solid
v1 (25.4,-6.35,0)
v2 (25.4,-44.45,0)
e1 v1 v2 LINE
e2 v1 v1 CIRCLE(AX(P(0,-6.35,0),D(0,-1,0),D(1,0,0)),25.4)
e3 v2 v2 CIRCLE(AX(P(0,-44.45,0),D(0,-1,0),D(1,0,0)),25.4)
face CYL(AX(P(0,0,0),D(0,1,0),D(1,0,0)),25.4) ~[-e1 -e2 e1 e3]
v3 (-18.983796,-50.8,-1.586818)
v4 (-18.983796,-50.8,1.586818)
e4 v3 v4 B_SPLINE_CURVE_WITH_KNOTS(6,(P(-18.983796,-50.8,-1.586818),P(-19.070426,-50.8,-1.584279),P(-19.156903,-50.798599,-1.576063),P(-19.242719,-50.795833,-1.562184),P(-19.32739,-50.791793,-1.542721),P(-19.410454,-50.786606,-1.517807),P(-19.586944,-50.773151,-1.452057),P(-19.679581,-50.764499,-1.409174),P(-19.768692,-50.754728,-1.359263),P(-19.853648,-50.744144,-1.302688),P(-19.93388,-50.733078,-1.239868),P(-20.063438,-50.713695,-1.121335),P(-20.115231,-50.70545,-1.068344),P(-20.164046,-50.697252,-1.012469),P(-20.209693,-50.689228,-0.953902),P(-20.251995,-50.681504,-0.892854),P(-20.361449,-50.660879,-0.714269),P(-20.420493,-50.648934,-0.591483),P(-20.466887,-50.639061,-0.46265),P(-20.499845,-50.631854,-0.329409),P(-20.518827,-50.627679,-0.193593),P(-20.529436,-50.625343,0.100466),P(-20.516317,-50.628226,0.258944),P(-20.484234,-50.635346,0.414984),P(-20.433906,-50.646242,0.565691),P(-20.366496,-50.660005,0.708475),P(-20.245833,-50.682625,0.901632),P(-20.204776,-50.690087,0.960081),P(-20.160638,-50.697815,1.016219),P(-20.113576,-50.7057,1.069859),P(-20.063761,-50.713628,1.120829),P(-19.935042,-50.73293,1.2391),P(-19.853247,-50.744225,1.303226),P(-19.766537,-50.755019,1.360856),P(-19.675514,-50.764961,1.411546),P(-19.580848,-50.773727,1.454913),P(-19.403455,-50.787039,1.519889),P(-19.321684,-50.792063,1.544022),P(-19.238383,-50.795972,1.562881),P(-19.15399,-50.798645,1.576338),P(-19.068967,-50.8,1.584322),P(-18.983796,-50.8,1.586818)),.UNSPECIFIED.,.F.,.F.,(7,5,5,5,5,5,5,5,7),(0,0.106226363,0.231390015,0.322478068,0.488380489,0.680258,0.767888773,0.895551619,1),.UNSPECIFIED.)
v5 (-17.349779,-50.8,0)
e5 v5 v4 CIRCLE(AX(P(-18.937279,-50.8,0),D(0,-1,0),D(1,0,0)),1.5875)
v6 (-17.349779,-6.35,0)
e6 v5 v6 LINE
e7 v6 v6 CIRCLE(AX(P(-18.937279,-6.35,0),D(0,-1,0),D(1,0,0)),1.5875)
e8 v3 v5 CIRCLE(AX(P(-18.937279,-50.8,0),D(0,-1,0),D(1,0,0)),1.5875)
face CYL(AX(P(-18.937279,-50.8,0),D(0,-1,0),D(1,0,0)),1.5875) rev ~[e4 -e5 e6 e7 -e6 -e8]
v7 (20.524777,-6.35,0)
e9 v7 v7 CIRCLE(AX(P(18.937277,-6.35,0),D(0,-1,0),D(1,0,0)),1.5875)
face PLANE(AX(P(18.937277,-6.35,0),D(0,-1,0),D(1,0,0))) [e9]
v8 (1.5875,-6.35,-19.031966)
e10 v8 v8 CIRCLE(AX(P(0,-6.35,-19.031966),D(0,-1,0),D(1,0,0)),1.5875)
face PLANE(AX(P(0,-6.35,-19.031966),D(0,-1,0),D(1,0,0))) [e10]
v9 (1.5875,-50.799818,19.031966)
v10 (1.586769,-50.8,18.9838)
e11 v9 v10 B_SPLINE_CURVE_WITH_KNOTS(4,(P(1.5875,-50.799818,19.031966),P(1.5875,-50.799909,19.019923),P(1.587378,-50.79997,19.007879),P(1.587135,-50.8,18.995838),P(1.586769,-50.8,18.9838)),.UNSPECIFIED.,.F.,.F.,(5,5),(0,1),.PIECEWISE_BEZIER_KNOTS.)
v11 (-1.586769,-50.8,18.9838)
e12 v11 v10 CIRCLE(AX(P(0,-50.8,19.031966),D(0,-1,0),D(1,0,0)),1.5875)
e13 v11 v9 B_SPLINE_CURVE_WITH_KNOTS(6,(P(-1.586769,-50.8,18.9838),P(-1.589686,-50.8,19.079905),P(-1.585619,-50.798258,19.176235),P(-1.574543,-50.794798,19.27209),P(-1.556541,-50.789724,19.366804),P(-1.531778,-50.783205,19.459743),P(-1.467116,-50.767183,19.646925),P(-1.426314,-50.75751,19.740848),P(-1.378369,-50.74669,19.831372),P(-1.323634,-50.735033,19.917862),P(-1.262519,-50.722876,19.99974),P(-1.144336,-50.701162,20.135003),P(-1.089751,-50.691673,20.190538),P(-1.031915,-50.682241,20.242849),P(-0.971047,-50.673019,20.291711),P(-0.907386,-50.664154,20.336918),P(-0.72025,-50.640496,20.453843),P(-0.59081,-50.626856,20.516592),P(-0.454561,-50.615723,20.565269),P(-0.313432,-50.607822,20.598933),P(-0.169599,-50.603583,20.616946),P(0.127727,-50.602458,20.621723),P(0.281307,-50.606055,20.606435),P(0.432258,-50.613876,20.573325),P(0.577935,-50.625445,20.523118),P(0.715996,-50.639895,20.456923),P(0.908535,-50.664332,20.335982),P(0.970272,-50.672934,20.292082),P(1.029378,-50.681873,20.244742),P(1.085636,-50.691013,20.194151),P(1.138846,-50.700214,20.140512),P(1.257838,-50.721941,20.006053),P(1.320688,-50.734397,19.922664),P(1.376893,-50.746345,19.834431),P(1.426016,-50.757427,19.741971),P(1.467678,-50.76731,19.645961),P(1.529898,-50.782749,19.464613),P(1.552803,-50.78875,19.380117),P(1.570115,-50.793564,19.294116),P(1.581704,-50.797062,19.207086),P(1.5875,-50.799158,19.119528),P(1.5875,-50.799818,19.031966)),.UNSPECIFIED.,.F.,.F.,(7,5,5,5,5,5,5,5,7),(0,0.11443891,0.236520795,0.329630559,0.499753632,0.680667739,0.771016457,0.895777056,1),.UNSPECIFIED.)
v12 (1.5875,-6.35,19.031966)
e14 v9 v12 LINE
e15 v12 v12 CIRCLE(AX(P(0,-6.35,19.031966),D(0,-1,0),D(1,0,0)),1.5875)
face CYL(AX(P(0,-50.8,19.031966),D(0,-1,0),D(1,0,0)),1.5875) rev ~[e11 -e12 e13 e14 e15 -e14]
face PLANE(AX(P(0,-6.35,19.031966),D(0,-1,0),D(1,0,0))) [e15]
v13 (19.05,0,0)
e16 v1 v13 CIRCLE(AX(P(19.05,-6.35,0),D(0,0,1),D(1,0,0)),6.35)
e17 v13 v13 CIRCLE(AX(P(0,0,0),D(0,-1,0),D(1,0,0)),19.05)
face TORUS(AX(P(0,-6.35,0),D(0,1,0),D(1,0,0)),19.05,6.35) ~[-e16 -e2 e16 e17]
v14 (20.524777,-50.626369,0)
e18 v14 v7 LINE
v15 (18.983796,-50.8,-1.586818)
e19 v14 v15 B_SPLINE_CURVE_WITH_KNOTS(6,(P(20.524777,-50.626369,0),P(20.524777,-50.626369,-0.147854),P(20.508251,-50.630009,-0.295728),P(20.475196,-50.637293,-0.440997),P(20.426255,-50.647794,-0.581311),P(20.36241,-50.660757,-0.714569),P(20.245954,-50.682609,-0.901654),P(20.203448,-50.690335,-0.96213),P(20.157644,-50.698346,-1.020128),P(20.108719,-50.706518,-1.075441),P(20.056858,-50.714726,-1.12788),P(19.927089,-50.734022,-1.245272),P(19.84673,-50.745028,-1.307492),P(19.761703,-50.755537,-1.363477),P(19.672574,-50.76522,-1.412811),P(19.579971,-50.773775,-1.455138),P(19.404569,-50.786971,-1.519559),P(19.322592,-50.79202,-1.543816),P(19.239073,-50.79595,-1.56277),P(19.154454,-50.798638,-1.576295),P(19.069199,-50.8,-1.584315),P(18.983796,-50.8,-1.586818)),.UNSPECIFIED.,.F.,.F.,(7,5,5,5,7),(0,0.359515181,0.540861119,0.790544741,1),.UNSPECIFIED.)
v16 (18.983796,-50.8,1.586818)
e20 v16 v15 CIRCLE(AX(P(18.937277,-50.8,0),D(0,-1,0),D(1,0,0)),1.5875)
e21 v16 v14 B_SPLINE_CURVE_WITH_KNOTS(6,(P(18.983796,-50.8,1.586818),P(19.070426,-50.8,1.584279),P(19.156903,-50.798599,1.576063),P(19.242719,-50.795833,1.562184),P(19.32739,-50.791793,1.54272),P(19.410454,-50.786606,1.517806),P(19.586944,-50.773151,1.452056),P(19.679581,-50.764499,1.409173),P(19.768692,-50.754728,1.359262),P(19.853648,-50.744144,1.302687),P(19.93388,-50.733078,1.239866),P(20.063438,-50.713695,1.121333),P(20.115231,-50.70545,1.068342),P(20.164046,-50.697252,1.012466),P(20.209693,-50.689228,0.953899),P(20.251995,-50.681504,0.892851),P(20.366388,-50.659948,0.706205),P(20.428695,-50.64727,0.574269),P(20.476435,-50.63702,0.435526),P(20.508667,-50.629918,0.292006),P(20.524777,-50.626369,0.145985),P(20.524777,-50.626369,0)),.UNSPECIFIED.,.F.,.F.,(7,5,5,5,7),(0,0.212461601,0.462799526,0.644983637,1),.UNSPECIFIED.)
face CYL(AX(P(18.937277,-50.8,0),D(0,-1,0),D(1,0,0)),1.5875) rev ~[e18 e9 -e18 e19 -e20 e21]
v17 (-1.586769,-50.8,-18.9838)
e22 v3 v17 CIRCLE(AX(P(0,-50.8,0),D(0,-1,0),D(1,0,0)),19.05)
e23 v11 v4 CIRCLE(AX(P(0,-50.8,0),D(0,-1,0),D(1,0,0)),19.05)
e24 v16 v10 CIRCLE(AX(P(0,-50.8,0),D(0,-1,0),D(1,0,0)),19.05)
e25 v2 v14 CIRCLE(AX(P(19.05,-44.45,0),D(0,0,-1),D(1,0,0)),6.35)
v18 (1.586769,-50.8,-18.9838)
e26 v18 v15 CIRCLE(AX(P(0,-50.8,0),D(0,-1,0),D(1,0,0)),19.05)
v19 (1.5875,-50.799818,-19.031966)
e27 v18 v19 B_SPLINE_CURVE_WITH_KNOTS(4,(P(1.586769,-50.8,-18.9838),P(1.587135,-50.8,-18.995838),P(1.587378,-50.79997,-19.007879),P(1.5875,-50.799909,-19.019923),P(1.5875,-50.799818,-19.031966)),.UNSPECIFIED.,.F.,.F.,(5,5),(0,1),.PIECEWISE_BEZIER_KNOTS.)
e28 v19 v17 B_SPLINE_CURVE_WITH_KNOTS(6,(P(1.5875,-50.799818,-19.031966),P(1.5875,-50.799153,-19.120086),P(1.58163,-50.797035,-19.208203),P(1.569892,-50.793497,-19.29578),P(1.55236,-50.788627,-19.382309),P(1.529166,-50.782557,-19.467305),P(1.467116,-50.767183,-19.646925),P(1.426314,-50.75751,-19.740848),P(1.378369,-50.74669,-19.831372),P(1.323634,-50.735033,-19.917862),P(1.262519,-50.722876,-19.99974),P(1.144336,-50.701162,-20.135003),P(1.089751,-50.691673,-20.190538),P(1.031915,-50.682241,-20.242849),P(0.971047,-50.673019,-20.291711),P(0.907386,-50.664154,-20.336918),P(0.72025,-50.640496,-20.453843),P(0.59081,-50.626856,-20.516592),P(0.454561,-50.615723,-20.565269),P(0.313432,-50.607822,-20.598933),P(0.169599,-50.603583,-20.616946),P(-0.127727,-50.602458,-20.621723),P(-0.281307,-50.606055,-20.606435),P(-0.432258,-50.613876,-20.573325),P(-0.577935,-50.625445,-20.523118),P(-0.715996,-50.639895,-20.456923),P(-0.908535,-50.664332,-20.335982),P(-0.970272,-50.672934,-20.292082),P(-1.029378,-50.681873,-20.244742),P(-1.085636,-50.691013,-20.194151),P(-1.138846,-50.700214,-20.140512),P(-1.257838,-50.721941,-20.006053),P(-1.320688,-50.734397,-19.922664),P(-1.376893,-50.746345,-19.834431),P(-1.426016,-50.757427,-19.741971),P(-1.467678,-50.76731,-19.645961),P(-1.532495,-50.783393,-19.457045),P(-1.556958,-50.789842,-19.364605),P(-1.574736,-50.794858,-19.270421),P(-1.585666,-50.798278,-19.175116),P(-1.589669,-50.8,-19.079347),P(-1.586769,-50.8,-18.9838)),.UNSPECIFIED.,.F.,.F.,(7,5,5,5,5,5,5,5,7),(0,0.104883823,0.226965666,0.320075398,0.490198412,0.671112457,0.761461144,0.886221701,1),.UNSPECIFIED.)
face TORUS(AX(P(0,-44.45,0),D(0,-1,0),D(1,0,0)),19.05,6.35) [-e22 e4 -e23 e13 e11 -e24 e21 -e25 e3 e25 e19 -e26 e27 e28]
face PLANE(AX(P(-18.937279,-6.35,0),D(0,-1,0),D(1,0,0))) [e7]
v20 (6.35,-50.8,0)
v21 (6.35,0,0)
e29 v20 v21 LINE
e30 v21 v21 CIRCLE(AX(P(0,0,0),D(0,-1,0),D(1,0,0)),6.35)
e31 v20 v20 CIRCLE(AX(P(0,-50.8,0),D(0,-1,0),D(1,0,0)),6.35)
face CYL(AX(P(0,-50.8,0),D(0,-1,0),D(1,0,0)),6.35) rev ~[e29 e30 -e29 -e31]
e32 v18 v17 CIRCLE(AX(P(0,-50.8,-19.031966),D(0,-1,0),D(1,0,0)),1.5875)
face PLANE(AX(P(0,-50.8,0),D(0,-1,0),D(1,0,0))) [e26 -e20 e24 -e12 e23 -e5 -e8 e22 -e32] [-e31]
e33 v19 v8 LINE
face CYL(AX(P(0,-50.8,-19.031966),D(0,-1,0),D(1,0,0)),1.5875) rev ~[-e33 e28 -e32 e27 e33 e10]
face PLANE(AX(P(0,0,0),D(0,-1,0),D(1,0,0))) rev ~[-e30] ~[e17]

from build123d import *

# Parameters (mm, degrees)
F0_R     = 25.4
F1_DEPTH = 50.8
F2_R     = 6.35
F3_DEPTH = 50.8
F4_R     = 1.5875
F5_DEPTH = 44.45
F7_R     = 6.35


# Not quite as in the source:
# - a fillet or chamfer that OpenCascade refuses, or shapes differently, is made with other operations: its cross-section is extruded or revolved along the edge and cut away or added


with BuildPart() as f1:
    # F0 (on Front) → F1 (new body)
    with BuildSketch(Plane.XZ):
        Circle(F0_R)
    extrude(amount=F1_DEPTH)

    # F2 (on face) → F3 (cut)
    with BuildSketch(Plane.XZ.offset(50.8)):
        Circle(F2_R)
    extrude(amount=-F3_DEPTH, mode=Mode.SUBTRACT)

    # F4 (on face) → F5 (cut)
    with BuildSketch(Plane.XZ.offset(50.8)):
        with Locations((0, 19.0319661051)):
            Circle(F4_R)
        with Locations((18.9372766763, 0)):
            Circle(F4_R)
        with Locations((0, -19.0319661051)):
            Circle(F4_R)
        with Locations((-18.9372785389, 0)):
            Circle(F4_R)
    extrude(amount=-F5_DEPTH, mode=Mode.SUBTRACT)

    # F6: fillet of radius 6.35 on 1 edges, made by hand

    # F6_s1 → F6_t2 (revolve, cut)
    with BuildSketch(Plane.XY):
        with BuildLine():
            ThreePointArc((25.4, -44.45), (23.5401280605, -48.9401280605), (19.05, -50.8))
            Line((19.05, -50.8), (25.4, -50.8))
            Line((25.4, -50.8), (25.4, -44.45))
        make_face()
    revolve(axis=Axis((0, -50.8, 0), (0, -1, 0)), mode=Mode.SUBTRACT)

    # F7
    f7_edges = [f1.edges().sort_by_distance(p)[0] for p in [
        (-25.4, 0, 0),
    ]]
    fillet(f7_edges, radius=F7_R)


solid = f1.part
